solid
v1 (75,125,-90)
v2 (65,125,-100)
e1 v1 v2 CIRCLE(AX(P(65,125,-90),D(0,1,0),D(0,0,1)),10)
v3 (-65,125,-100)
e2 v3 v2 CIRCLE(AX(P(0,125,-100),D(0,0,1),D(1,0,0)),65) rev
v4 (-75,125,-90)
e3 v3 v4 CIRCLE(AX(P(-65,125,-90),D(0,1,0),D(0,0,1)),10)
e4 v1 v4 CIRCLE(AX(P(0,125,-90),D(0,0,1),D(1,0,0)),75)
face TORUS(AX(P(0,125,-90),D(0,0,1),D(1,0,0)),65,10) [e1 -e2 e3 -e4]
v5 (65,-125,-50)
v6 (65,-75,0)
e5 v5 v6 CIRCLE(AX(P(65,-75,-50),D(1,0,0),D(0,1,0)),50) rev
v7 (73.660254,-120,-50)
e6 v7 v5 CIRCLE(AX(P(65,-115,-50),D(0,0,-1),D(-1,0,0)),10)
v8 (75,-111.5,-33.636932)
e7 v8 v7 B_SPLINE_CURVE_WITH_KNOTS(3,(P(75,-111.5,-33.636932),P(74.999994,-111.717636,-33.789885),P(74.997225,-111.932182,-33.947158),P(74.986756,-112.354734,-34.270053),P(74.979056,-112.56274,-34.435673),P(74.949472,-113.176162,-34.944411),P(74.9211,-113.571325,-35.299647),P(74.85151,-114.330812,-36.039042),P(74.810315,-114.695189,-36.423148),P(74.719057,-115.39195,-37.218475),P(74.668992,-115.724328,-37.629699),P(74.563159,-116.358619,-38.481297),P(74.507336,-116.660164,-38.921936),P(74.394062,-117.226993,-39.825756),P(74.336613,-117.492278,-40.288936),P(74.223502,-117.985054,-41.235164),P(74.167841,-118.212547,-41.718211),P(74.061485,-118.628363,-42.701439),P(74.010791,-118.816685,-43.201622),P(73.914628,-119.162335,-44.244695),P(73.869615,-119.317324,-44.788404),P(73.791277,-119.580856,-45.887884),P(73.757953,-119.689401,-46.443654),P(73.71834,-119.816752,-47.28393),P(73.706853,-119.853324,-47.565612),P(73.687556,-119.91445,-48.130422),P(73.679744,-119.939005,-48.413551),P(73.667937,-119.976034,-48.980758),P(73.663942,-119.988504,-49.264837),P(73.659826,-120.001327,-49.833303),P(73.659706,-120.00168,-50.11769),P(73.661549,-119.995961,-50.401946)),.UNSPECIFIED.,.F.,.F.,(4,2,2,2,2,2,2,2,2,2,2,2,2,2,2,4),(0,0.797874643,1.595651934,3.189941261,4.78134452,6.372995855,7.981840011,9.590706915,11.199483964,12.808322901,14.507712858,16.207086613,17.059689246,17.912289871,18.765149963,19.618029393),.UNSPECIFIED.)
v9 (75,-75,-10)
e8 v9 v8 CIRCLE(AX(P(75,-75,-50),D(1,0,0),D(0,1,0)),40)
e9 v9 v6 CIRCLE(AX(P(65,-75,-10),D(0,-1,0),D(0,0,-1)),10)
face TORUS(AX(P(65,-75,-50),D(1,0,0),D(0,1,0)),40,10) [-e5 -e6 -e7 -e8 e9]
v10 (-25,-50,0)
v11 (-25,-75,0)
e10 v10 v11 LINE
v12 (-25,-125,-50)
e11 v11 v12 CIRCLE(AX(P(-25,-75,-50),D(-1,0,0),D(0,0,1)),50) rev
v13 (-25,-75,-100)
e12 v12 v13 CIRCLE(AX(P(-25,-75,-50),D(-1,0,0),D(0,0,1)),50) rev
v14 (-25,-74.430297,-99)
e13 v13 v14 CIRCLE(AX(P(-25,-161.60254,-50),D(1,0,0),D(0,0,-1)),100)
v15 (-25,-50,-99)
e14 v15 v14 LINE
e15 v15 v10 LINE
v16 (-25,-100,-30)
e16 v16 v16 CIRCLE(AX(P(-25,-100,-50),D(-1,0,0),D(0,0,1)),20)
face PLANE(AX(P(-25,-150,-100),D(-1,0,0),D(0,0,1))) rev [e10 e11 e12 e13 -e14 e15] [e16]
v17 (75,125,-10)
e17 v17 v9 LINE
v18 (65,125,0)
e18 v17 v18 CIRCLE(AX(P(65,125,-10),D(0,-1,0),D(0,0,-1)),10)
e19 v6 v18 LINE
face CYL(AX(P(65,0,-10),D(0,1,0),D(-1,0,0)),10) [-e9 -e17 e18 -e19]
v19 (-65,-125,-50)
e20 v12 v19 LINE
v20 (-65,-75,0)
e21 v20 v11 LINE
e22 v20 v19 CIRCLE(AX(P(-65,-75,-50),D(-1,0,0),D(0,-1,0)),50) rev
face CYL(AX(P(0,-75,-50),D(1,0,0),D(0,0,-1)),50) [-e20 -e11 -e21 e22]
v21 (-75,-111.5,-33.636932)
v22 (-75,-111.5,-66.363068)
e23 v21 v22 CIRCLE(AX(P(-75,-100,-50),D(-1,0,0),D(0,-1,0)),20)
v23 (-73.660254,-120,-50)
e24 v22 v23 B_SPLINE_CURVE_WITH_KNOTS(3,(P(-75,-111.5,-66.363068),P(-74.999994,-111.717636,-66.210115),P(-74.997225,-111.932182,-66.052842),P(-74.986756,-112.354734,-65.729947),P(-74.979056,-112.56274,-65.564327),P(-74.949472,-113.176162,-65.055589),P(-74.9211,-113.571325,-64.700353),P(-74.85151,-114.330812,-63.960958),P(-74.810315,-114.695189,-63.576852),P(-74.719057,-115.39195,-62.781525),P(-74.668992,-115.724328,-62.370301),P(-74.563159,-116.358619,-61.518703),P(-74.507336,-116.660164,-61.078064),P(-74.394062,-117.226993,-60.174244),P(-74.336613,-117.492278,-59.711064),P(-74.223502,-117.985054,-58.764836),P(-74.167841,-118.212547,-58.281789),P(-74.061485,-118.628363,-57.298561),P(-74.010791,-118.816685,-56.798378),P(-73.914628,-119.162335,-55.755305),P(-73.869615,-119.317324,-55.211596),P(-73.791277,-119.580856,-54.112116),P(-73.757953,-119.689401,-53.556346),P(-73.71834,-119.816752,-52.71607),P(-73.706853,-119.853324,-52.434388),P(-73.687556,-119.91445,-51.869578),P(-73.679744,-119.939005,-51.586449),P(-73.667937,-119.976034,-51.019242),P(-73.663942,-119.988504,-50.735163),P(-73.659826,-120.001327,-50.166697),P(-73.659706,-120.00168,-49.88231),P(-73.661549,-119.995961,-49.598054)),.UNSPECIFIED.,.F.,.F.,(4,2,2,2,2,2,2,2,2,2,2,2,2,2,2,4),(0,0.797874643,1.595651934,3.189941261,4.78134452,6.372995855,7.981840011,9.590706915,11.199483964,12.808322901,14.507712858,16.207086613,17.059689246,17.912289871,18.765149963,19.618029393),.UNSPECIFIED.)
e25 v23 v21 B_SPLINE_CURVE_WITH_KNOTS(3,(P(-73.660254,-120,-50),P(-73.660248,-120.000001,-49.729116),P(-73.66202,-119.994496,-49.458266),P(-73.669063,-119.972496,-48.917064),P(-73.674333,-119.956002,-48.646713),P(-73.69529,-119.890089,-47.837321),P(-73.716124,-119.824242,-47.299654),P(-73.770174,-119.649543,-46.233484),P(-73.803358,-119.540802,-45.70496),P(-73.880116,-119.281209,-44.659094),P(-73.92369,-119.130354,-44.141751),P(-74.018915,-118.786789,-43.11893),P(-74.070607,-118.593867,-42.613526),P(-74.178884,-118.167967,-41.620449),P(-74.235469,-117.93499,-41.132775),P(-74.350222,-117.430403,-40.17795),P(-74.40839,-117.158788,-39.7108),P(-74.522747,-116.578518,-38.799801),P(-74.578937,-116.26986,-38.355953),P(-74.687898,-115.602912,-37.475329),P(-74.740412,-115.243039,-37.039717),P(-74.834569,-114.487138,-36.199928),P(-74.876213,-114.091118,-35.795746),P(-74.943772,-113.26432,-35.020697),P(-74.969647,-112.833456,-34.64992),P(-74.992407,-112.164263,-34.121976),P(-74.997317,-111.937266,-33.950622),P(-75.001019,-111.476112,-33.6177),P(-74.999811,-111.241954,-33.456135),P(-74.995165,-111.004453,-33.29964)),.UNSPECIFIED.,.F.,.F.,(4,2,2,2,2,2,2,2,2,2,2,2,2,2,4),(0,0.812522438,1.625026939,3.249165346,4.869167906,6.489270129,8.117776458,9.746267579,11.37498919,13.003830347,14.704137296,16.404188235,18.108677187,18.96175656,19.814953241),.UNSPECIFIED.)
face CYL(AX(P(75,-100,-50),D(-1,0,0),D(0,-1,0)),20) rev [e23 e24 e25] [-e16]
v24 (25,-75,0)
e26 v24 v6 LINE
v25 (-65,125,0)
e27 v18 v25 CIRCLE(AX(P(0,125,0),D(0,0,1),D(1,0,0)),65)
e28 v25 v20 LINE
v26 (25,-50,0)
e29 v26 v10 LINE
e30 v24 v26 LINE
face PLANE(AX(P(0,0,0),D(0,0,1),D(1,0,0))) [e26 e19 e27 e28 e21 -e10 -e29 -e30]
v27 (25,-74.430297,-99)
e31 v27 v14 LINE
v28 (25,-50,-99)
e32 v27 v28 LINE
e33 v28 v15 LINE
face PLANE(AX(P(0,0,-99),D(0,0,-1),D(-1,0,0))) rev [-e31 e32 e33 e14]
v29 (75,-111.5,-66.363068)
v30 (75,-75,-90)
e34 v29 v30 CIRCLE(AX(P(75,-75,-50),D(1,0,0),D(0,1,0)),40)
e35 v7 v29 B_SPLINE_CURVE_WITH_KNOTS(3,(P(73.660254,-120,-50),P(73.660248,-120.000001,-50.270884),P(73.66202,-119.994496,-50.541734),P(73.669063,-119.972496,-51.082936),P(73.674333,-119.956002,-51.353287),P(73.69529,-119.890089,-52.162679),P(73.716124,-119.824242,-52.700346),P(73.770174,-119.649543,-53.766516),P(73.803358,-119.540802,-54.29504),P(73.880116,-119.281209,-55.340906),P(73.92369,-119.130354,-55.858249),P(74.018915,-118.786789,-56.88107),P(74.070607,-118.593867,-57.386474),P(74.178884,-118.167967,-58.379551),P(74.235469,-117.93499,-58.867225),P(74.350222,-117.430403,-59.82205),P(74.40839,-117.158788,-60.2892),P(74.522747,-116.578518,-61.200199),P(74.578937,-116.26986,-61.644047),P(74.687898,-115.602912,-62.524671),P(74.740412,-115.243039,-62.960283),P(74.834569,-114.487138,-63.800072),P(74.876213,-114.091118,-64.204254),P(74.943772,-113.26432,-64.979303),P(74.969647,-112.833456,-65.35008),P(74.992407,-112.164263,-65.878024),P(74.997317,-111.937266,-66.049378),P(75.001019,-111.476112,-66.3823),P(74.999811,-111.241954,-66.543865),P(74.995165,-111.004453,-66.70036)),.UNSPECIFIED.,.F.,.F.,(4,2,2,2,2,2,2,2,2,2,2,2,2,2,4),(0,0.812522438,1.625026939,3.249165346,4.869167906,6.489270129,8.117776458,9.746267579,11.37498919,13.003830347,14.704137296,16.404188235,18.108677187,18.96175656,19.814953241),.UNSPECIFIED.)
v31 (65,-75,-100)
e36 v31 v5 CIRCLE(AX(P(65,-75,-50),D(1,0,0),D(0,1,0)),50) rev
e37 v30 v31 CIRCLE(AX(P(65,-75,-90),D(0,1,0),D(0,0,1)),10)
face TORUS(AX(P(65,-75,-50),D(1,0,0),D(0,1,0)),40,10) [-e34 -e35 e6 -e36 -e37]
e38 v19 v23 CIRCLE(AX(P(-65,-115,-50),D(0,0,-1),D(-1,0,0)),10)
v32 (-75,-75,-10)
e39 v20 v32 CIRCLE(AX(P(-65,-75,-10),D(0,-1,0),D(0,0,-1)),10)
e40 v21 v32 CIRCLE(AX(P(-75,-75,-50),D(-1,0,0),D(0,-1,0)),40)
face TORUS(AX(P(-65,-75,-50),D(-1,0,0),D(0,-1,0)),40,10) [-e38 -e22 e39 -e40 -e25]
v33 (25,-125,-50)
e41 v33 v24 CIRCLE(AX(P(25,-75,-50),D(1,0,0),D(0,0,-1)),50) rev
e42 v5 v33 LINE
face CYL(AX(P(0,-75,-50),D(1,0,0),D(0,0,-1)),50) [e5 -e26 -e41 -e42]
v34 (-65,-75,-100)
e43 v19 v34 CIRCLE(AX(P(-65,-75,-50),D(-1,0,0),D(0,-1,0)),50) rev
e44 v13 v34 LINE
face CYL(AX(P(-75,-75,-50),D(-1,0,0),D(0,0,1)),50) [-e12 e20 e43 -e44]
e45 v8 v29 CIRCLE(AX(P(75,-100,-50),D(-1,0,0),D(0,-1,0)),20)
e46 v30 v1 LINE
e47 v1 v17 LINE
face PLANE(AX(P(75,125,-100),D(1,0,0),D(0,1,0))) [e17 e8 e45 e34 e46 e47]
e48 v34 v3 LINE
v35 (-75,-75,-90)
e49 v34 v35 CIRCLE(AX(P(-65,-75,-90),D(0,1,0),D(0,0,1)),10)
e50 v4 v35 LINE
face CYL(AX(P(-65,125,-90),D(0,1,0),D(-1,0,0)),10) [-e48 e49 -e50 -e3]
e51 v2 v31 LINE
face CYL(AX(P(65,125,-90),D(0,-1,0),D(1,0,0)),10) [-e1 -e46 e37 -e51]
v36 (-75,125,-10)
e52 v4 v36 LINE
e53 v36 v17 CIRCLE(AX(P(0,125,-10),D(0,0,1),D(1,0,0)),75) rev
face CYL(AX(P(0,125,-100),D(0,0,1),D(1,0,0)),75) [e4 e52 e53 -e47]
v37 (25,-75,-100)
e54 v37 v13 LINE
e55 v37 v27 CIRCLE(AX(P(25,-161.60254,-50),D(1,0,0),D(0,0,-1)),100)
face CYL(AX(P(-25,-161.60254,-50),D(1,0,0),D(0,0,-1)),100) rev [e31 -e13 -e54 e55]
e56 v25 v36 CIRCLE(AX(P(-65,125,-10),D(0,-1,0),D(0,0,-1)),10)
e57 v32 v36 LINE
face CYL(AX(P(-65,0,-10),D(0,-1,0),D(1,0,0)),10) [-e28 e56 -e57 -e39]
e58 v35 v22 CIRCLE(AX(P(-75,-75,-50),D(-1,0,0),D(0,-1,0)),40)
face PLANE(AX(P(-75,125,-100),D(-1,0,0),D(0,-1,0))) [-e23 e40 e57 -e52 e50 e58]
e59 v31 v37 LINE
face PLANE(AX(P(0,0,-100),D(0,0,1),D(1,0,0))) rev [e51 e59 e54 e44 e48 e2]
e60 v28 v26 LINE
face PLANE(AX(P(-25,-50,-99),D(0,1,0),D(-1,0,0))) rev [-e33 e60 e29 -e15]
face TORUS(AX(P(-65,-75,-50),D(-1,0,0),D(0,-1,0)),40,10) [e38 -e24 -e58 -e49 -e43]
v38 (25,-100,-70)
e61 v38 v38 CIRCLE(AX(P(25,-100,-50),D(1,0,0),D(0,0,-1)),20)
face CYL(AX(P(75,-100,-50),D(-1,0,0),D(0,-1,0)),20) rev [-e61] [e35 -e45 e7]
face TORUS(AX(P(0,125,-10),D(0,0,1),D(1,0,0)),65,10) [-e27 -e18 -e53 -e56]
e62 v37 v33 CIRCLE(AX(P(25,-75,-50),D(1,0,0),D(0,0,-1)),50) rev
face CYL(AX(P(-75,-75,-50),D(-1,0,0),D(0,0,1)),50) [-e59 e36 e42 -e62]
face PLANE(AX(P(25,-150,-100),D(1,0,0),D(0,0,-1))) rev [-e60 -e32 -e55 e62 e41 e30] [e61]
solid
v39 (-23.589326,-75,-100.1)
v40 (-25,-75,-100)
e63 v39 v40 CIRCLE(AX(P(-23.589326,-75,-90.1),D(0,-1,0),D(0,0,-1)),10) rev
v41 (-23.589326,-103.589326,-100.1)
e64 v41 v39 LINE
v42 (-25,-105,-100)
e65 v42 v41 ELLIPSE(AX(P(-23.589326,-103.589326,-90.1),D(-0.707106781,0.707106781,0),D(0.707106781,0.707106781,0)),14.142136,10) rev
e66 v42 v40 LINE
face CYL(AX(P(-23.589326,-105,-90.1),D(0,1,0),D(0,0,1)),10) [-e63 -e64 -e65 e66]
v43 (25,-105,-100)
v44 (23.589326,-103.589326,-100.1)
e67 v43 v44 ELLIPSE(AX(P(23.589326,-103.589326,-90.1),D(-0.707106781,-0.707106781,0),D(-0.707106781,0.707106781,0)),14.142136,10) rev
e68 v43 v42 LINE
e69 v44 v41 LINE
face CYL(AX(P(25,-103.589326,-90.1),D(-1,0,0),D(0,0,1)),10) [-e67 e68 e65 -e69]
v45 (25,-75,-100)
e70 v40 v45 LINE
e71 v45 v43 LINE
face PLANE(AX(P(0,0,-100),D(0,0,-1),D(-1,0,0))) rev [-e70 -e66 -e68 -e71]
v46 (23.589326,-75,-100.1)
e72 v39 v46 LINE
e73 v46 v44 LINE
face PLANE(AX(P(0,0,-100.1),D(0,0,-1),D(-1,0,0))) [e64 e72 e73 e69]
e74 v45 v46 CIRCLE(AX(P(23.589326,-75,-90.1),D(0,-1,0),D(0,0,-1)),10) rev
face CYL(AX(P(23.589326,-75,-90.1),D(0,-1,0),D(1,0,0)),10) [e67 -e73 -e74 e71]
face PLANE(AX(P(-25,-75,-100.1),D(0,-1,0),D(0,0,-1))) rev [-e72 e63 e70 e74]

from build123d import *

# Parameters (mm, degrees)
BOSS_EXTRUDE1_DEPTH    = 100
SKETCH2_W              = 50
SKETCH2_H              = 50
CUT_EXTRUDE1_DEPTH     = 177.776695297
CUT_EXTRUDE2_DEPTH     = 25
SKETCH7_R              = 20
CUT_EXTRUDE3_DEPTH     = 220.374109685
FILLET2_R              = 50
CUT_EXTRUDE6_START     = -125
CUT_EXTRUDE6_OUTLINE_W = 50
CUT_EXTRUDE6_OUTLINE_H = 6.698729811
CUT_EXTRUDE6_DEPTH     = 50
CUT_EXTRUDE7_DEPTH     = 25
BOSS_EXTRUDE2_DEPTH    = 100
FILLET4_R              = 10
SKETCH11_W             = 50
SKETCH11_H             = 25
CUT_EXTRUDE11_DEPTH    = 99
SKETCH16_W             = 50
SKETCH16_H             = 30
BOSS_EXTRUDE3_DEPTH    = 0.1
FILLET5_R              = 10


with BuildPart() as part:
    # Sketch1 → Boss-Extrude1 (new body)
    with BuildSketch(Plane.XY):
        Polygon((-75, 125), (0.2, 125), (49.8, 125), (75, 125), (75, -125), (-75, -125), align=None)
    extrude(amount=-BOSS_EXTRUDE1_DEPTH)

    # Sketch2 → Cut-Extrude1 (cut, through all)
    with BuildSketch(Plane.XY):
        with Locations((0, -125)):
            Rectangle(SKETCH2_W, SKETCH2_H)
    extrude(amount=-CUT_EXTRUDE1_DEPTH, mode=Mode.SUBTRACT)

    # Sketch6 → Cut-Extrude2 (cut, symmetric)
    with BuildSketch(Plane(origin=(0, 0, 0), x_dir=(0, 0, -1), z_dir=(1, 0, 0))):
        with BuildLine():
            Line((100, -100), (0, -100))
            ThreePointArc((0, -100), (50, -50), (100, -100))
        make_face()
    extrude(amount=CUT_EXTRUDE2_DEPTH, both=True, mode=Mode.SUBTRACT)

    # Sketch7 → Cut-Extrude3 (cut, through all)
    with BuildSketch(Plane.ZY.offset(75)):
        with Locations(Location((-50, -100, 0), (0, 0, 270))):
            Circle(SKETCH7_R)
    extrude(amount=-CUT_EXTRUDE3_DEPTH, mode=Mode.SUBTRACT)

    # Fillet2
    fillet2_edges = [part.edges().sort_by_distance(p)[0] for p in [
        (-50, -125, -100),
        (-50, -125, 0),
    ]]
    fillet(fillet2_edges, radius=FILLET2_R - 0.0001)  # a hair under: the kernel refuses the full size

    # Cut-Extrude6: read off the stored shape, not the designer's step
    # Cut-Extrude6 outline → Cut-Extrude6 (cut)
    with BuildSketch(Plane(origin=(0, 0, 0), x_dir=(1, 0, 0), z_dir=(0, 1, 0)).offset(CUT_EXTRUDE6_START)):
        with Locations((0, 96.650635095)):
            Rectangle(CUT_EXTRUDE6_OUTLINE_W, CUT_EXTRUDE6_OUTLINE_H)
        with Locations((0, 3.349364906)):
            Rectangle(CUT_EXTRUDE6_OUTLINE_W, CUT_EXTRUDE6_OUTLINE_H)
    extrude(amount=CUT_EXTRUDE6_DEPTH, mode=Mode.SUBTRACT)

    # Sketch10 → Cut-Extrude7 (cut, symmetric)
    with BuildSketch(Plane(origin=(0, 0, 0), x_dir=(0, 0, -1), z_dir=(1, 0, 0))):
        with BuildLine():
            Line((0, -75), (100, -75))
            ThreePointArc((100, -75), (50, -61.602540378), (0, -75))
        make_face()
    extrude(amount=CUT_EXTRUDE7_DEPTH, both=True, mode=Mode.SUBTRACT)

    # Sketch15 → Boss-Extrude2 (add)
    with BuildSketch(Plane.XY):
        with BuildLine():
            Line((-75, 125), (75, 125))
            ThreePointArc((75, 125), (0, 200), (-75, 125))
        make_face()
    extrude(amount=-BOSS_EXTRUDE2_DEPTH)

    # Fillet4
    # the kernel refuses this fillet: 10 mm, written as the material it takes off along each edge
    with BuildSketch(Plane(origin=(0, 125, -100), x_dir=(1, 0, 0), z_dir=(0, -1, 0))) as fillet4_piece_1:
        with BuildLine():
            CenterArc((75 - FILLET4_R, FILLET4_R), FILLET4_R, 270, 90)
            Line((75, FILLET4_R), (75, 0))
            Line((75, 0), (75 - FILLET4_R, 0))
        make_face()
    revolve(axis=Axis((0, 125, -100), (0, 0, 1)), revolution_arc=180, mode=Mode.SUBTRACT)
    with BuildSketch(Plane(origin=(0, 125, 0), x_dir=(1, 0, 0), z_dir=(0, -1, 0))) as fillet4_piece_2:
        with BuildLine():
            CenterArc((75 - FILLET4_R, -FILLET4_R), FILLET4_R, 0, 90)
            Line((75, -FILLET4_R), (75, 0))
            Line((75, 0), (75 - FILLET4_R, 0))
        make_face()
    revolve(axis=Axis((0, 125, 0), (0, 0, 1)), revolution_arc=180, mode=Mode.SUBTRACT)
    with BuildSketch(Plane(origin=(-75, -75.0001, -100), x_dir=(0, 0, 1), z_dir=(0, 1, 0)), Plane(origin=(75, 125, 0), x_dir=(-1, 0, 0), z_dir=(0, -1, 0))) as fillet4_piece_3:
        with BuildLine():
            CenterArc((FILLET4_R, FILLET4_R), FILLET4_R, 180, 90)
            Line((0, FILLET4_R), (0, 0))
            Line((0, 0), (FILLET4_R, 0))
        make_face()
    extrude(amount=200.0001, mode=Mode.SUBTRACT)
    with BuildSketch(Plane(origin=(75, 125, -100), x_dir=(-1, 0, 0), z_dir=(0, -1, 0)), Plane(origin=(-75, -75.0001, 0), x_dir=(0, 0, -1), z_dir=(0, 1, 0))) as fillet4_piece_4:
        with BuildLine():
            CenterArc((FILLET4_R, -FILLET4_R), FILLET4_R, 90, 90)
            Line((0, -FILLET4_R), (0, 0))
            Line((0, 0), (FILLET4_R, 0))
        make_face()
    extrude(amount=200.0001, mode=Mode.SUBTRACT)
    with BuildSketch(Plane(origin=(75, -75.0001, -49.9999), x_dir=(0, 0, 1), z_dir=(0, 1, 0))) as fillet4_piece_5:
        with BuildLine():
            CenterArc((49.9999 - FILLET4_R, -FILLET4_R), FILLET4_R, 0, 90)
            Line((49.9999 - FILLET4_R, 0), (49.9999, 0))
            Line((49.9999, 0), (49.9999, -FILLET4_R))
        make_face()
    revolve(axis=Axis((75, -75.0001, -49.9999), (1, 0, 0)), revolution_arc=90, mode=Mode.SUBTRACT)
    with BuildSketch(Plane(origin=(75, -75.0001, -50.0001), x_dir=(0, 0, -1), z_dir=(0, 1, 0))) as fillet4_piece_6:
        with BuildLine():
            CenterArc((49.9999 - FILLET4_R, FILLET4_R), FILLET4_R, 270, 90)
            Line((49.9999, FILLET4_R), (49.9999, 0))
            Line((49.9999, 0), (49.9999 - FILLET4_R, 0))
        make_face()
    revolve(axis=Axis((75, -75.0001, -50.0001), (-1, 0, 0)), revolution_arc=90, mode=Mode.SUBTRACT)
    with BuildSketch(Plane(origin=(-75, -75.0001, -49.9999), x_dir=(0, 0, 1), z_dir=(0, 1, 0))) as fillet4_piece_7:
        with BuildLine():
            CenterArc((49.9999 - FILLET4_R, FILLET4_R), FILLET4_R, 270, 90)
            Line((49.9999, FILLET4_R), (49.9999, 0))
            Line((49.9999, 0), (49.9999 - FILLET4_R, 0))
        make_face()
    revolve(axis=Axis((-75, -75.0001, -49.9999), (1, 0, 0)), revolution_arc=90, mode=Mode.SUBTRACT)
    with BuildSketch(Plane(origin=(-75, -75.0001, -50.0001), x_dir=(0, 0, -1), z_dir=(0, 1, 0))) as fillet4_piece_8:
        with BuildLine():
            CenterArc((49.9999 - FILLET4_R, -FILLET4_R), FILLET4_R, 0, 90)
            Line((49.9999, -FILLET4_R), (49.9999, 0))
            Line((49.9999, 0), (49.9999 - FILLET4_R, 0))
        make_face()
    revolve(axis=Axis((-75, -75.0001, -50.0001), (-1, 0, 0)), revolution_arc=90, mode=Mode.SUBTRACT)
    with BuildSketch(Plane(origin=(-75, -125, -49.9999), x_dir=(0, 1, 0), z_dir=(0, 0, -1))) as fillet4_piece_9:
        with BuildLine():
            CenterArc((FILLET4_R, FILLET4_R), FILLET4_R, 180, 90)
            Line((0, FILLET4_R), (0, 0))
            Line((0, 0), (FILLET4_R, 0))
        make_face()
    extrude(amount=0.0002, mode=Mode.SUBTRACT)
    with BuildSketch(Plane(origin=(75, -125, -49.9999), x_dir=(0, 1, 0), z_dir=(0, 0, -1))) as fillet4_piece_10:
        with BuildLine():
            CenterArc((FILLET4_R, -FILLET4_R), FILLET4_R, 90, 90)
            Line((0, -FILLET4_R), (0, 0))
            Line((0, 0), (FILLET4_R, 0))
        make_face()
    extrude(amount=0.0002, mode=Mode.SUBTRACT)

    # Sketch11 → Cut-Extrude11 (cut)
    with BuildSketch(Plane.XY):
        with Locations((0, -62.5)):
            Rectangle(SKETCH11_W, SKETCH11_H)
    extrude(amount=-CUT_EXTRUDE11_DEPTH, mode=Mode.SUBTRACT)


with BuildPart() as body_2:
    # Sketch16 → Boss-Extrude3 (new body)
    with BuildSketch(Plane(origin=(0, 0, -100), x_dir=(-1, 0, 0), z_dir=(0, 0, -1))):
        with Locations((0, -90)):
            Rectangle(SKETCH16_W, SKETCH16_H)
    extrude(amount=BOSS_EXTRUDE3_DEPTH)

    # Fillet5
    # the kernel refuses this fillet: 10 mm, written as the material it takes off along each edge
    with BuildSketch(Plane(origin=(25, -71.473316005, -100.1), x_dir=(0, 0, 1), z_dir=(0, -1, 0)), Plane(origin=(-25, -108.526683995, -100.1), x_dir=(0, 0, 1), z_dir=(0, 1, 0))) as fillet5_piece_1:
        with BuildLine():
            CenterArc((10, 1.410673598), FILLET5_R, 180, 8.109614456)
            Line((0, 1.410673598), (0, 0))
            Line((0, 0), (0.1, 0))
        make_face()
    extrude(amount=37.05336799, mode=Mode.SUBTRACT)
    with BuildSketch(Plane(origin=(28.526683995, -105, -100.1), x_dir=(0, 0, 1), z_dir=(-1, 0, 0))) as fillet5_piece_2:
        with BuildLine():
            CenterArc((10, 1.410673598), FILLET5_R, 180, 8.109614456)
            Line((0, 1.410673598), (0, 0))
            Line((0, 0), (0.1, 0))
        make_face()
    extrude(amount=57.05336799, mode=Mode.SUBTRACT)


solid = Compound([part.part, body_2.part])
